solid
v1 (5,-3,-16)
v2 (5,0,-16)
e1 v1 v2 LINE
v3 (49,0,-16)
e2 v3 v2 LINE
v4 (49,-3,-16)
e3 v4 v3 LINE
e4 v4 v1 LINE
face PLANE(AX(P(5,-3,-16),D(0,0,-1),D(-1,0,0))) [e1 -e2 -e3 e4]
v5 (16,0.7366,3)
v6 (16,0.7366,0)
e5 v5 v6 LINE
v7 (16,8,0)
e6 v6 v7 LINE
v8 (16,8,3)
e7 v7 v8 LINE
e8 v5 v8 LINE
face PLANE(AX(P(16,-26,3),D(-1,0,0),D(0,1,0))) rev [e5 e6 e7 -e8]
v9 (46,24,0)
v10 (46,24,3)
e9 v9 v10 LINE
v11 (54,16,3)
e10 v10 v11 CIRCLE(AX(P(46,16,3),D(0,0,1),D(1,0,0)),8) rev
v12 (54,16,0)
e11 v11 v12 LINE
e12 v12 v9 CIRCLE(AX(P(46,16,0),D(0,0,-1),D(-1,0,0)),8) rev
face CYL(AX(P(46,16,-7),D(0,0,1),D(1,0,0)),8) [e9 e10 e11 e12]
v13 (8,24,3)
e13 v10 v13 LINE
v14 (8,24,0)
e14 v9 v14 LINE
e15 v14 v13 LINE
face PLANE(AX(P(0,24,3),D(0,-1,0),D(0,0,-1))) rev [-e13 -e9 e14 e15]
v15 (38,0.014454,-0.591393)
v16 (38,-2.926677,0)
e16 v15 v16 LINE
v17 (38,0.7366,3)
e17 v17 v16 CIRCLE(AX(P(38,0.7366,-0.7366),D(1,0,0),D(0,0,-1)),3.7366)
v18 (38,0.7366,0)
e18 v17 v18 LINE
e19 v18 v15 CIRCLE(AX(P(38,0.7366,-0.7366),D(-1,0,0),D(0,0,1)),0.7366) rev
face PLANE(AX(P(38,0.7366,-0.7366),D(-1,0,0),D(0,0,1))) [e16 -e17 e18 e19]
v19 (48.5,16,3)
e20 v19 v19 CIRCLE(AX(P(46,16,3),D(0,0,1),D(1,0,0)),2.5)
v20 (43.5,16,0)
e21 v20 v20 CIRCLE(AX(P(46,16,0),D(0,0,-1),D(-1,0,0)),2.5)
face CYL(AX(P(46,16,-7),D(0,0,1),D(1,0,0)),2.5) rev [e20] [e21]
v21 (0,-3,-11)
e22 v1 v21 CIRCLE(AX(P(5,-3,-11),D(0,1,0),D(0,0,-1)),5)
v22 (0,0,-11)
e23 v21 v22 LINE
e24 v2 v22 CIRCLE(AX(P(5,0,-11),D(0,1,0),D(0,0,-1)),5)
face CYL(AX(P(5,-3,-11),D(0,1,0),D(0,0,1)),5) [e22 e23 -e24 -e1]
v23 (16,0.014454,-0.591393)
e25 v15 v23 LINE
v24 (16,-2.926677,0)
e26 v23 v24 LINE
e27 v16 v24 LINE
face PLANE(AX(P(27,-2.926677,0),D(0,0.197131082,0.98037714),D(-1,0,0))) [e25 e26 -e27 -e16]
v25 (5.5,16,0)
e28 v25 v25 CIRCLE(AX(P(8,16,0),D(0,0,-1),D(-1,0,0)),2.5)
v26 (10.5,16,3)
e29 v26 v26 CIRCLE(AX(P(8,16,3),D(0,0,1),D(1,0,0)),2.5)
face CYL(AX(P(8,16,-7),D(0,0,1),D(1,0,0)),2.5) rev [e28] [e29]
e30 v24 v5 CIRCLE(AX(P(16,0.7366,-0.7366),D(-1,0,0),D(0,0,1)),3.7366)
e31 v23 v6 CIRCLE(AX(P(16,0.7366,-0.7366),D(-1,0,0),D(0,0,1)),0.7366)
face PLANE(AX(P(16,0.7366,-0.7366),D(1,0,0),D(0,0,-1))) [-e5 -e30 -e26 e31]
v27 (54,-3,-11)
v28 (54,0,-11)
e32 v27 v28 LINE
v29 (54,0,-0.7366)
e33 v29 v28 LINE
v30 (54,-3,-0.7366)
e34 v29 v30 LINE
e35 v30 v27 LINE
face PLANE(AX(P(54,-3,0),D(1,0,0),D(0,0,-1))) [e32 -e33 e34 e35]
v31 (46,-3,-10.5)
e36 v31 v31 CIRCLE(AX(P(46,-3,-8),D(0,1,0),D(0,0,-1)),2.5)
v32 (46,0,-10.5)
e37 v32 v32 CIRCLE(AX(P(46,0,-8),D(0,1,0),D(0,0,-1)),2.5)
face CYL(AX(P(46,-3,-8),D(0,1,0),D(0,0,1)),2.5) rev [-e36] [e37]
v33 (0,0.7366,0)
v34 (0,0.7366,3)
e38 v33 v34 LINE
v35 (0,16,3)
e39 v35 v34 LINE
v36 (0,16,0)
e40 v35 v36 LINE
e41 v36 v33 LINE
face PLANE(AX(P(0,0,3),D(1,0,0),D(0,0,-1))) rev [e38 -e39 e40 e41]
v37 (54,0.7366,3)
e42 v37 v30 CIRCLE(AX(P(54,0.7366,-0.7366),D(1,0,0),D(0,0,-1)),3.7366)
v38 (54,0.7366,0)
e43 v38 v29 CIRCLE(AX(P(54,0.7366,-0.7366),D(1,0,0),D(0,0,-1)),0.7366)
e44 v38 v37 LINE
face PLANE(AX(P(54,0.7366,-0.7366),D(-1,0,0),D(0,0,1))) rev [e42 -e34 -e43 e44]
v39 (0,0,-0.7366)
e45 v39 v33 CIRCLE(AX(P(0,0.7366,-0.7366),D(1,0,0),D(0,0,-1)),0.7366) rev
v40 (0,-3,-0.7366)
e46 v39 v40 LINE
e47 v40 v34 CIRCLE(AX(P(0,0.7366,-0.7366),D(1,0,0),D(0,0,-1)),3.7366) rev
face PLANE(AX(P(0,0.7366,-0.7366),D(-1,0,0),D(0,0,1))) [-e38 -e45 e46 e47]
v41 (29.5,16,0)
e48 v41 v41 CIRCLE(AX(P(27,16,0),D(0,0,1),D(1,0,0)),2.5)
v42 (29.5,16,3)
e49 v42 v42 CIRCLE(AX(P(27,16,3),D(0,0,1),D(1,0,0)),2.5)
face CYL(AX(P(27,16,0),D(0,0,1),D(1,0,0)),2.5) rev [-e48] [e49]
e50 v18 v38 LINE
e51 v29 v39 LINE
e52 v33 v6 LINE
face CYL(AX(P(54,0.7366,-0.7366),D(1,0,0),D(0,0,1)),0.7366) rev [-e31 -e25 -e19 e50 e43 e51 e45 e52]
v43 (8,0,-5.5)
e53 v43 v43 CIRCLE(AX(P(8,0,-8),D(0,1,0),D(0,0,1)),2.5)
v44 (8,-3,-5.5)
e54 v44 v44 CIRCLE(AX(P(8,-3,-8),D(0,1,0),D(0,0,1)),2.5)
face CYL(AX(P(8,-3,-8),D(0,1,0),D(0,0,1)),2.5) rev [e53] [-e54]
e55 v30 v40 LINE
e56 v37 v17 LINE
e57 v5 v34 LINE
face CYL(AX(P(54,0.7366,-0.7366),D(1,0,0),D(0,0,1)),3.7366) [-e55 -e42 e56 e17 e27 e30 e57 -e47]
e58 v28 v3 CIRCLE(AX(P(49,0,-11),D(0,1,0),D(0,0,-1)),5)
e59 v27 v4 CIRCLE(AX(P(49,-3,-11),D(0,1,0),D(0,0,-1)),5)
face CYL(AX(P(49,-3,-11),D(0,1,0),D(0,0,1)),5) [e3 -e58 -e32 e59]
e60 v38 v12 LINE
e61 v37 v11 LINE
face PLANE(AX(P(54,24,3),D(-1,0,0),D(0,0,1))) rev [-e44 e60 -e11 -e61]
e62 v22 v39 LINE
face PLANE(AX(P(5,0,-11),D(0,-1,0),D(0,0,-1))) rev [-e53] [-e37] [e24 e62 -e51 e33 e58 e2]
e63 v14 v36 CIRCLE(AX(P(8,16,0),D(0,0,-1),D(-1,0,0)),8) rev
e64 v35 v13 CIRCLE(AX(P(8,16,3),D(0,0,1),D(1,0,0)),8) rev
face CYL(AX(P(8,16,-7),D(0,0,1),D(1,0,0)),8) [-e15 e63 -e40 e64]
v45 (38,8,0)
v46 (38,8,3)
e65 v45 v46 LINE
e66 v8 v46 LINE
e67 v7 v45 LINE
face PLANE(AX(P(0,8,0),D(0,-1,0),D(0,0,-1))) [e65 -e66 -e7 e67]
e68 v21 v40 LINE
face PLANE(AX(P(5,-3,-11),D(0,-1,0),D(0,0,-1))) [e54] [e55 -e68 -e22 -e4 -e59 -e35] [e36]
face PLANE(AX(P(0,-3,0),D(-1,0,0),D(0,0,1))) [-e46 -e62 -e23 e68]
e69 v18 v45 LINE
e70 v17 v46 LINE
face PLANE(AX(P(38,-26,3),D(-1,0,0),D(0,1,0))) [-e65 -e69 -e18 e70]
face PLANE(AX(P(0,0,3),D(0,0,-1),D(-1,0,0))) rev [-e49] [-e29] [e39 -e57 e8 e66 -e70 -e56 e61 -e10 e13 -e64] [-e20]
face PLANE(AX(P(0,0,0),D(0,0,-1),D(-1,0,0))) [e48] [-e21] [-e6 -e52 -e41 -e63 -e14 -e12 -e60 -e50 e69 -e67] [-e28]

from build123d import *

# Parameters (mm, degrees)
SKETCH1_R                    = 2.5
BASE_FLANGE1_DEPTH           = 3
EDGE_FLANGE1_STRIP_W         = 13.4732
EDGE_FLANGE1_STRIP_H         = 3
EDGE_FLANGE1_STRIP_CUT_DEPTH = 54
EDGE_FLANGE1_DEPTH           = 54
CUT_EXTRUDE1_START           = 16
CUT_EXTRUDE1_DEPTH           = 22
SKETCH10_R                   = 2.5
CUT_EXTRUDE2_DEPTH           = 10
SKETCH11_W                   = 22
SKETCH11_H                   = 16
SKETCH11_R                   = 2.5
BOSS_EXTRUDE1_DEPTH          = 3


# Read off the part's stored shape, not the designer's step: Cut-Extrude1
# Sheet-metal steps are written as plain solids
with BuildPart() as part:
    # Sketch1 → Base-Flange1 (new body)
    with BuildSketch(Plane(origin=(0, 0, 0), x_dir=(1, 0, 0), z_dir=(0, 1, 0))):
        with BuildLine():
            Line((0, 0), (54, 0))
            Line((54, 0), (54, 11))
            ThreePointArc((54, 11), (52.535533906, 14.535533906), (49, 16))
            Line((49, 16), (5, 16))
            ThreePointArc((5, 16), (1.464466094, 14.535533906), (0, 11))
            Line((0, 11), (0, 0))
        make_face()
        with Locations(Location((8, 8, 0), (0, 0, 270))):
            Circle(SKETCH1_R, mode=Mode.SUBTRACT)
        with Locations(Location((46, 8, 0), (0, 0, 90))):
            Circle(SKETCH1_R, mode=Mode.SUBTRACT)
    extrude(amount=-BASE_FLANGE1_DEPTH)

    # Edge-Flange1 strip (across the edge) → Edge-Flange1 strip cut (cut)
    with BuildSketch(Plane(origin=(0, 0, 0), x_dir=(0, 0, -1), z_dir=(1, 0, 0))):
        with Locations((-6, -1.5)):
            Rectangle(EDGE_FLANGE1_STRIP_W, EDGE_FLANGE1_STRIP_H)
    extrude(amount=EDGE_FLANGE1_STRIP_CUT_DEPTH, mode=Mode.SUBTRACT)

    # Edge-Flange1 section (across the edge) → Edge-Flange1 (add)
    with BuildSketch(Plane(origin=(0, 0, 0), x_dir=(0, 0, -1), z_dir=(1, 0, 0))):
        with BuildLine():
            Line((-3, 0.7366), (-3, 24))
            Line((-3, 24), (0, 24))
            Line((0, 24), (0, 0.7366))
            ThreePointArc((0, 0.7366), (0.215745145, 0.215745145), (0.7366, 0))
            Line((0.7366, 0), (0.7366, -3))
            ThreePointArc((0.7366, -3), (-1.905575199, -1.905575199), (-3, 0.7366))
        make_face()
    extrude(amount=EDGE_FLANGE1_DEPTH)

    # Cut-Extrude1 outline → Cut-Extrude1 (cut)
    with BuildSketch(Plane.YZ.offset(CUT_EXTRUDE1_START)):
        with BuildLine():
            Line((-2.926677222, 0), (0.014454199, -0.591393245))
            ThreePointArc((0.014454199, -0.591393245), (0.269898669, -0.166714548), (0.7366, 0))
            Line((0.7366, 0), (24, 0))
            Line((24, 0), (24, 3))
            Line((24, 3), (0.7366, 3))
            ThreePointArc((0.7366, 3), (-1.630867001, 2.154295979), (-2.926677222, 0))
        make_face()
    extrude(amount=CUT_EXTRUDE1_DEPTH, mode=Mode.SUBTRACT)

    # Sketch10 → Cut-Extrude2 (cut)
    with BuildSketch(Plane.XY.offset(3)):
        with BuildLine():
            ThreePointArc((46, 24), (51.656854249, 21.656854249), (54, 16))
            Line((54, 16), (54, 24))
            Line((54, 24), (46, 24))
        make_face()
        with Locations((46, 16)):
            Circle(SKETCH10_R)
        with Locations((8, 16)):
            Circle(SKETCH10_R)
        with BuildLine():
            ThreePointArc((0, 16), (2.343145751, 21.656854249), (8, 24))
            Line((8, 24), (0, 24))
            Line((0, 24), (0, 16))
        make_face()
    extrude(amount=-CUT_EXTRUDE2_DEPTH, mode=Mode.SUBTRACT)

    # Sketch11 → Boss-Extrude1 (add)
    with BuildSketch(Plane.XY.offset(3)):
        with Locations((27, 16)):
            Rectangle(SKETCH11_W, SKETCH11_H)
        with Locations((27, 16)):
            Circle(SKETCH11_R, mode=Mode.SUBTRACT)
    extrude(amount=-BOSS_EXTRUDE1_DEPTH)


solid = part.part
